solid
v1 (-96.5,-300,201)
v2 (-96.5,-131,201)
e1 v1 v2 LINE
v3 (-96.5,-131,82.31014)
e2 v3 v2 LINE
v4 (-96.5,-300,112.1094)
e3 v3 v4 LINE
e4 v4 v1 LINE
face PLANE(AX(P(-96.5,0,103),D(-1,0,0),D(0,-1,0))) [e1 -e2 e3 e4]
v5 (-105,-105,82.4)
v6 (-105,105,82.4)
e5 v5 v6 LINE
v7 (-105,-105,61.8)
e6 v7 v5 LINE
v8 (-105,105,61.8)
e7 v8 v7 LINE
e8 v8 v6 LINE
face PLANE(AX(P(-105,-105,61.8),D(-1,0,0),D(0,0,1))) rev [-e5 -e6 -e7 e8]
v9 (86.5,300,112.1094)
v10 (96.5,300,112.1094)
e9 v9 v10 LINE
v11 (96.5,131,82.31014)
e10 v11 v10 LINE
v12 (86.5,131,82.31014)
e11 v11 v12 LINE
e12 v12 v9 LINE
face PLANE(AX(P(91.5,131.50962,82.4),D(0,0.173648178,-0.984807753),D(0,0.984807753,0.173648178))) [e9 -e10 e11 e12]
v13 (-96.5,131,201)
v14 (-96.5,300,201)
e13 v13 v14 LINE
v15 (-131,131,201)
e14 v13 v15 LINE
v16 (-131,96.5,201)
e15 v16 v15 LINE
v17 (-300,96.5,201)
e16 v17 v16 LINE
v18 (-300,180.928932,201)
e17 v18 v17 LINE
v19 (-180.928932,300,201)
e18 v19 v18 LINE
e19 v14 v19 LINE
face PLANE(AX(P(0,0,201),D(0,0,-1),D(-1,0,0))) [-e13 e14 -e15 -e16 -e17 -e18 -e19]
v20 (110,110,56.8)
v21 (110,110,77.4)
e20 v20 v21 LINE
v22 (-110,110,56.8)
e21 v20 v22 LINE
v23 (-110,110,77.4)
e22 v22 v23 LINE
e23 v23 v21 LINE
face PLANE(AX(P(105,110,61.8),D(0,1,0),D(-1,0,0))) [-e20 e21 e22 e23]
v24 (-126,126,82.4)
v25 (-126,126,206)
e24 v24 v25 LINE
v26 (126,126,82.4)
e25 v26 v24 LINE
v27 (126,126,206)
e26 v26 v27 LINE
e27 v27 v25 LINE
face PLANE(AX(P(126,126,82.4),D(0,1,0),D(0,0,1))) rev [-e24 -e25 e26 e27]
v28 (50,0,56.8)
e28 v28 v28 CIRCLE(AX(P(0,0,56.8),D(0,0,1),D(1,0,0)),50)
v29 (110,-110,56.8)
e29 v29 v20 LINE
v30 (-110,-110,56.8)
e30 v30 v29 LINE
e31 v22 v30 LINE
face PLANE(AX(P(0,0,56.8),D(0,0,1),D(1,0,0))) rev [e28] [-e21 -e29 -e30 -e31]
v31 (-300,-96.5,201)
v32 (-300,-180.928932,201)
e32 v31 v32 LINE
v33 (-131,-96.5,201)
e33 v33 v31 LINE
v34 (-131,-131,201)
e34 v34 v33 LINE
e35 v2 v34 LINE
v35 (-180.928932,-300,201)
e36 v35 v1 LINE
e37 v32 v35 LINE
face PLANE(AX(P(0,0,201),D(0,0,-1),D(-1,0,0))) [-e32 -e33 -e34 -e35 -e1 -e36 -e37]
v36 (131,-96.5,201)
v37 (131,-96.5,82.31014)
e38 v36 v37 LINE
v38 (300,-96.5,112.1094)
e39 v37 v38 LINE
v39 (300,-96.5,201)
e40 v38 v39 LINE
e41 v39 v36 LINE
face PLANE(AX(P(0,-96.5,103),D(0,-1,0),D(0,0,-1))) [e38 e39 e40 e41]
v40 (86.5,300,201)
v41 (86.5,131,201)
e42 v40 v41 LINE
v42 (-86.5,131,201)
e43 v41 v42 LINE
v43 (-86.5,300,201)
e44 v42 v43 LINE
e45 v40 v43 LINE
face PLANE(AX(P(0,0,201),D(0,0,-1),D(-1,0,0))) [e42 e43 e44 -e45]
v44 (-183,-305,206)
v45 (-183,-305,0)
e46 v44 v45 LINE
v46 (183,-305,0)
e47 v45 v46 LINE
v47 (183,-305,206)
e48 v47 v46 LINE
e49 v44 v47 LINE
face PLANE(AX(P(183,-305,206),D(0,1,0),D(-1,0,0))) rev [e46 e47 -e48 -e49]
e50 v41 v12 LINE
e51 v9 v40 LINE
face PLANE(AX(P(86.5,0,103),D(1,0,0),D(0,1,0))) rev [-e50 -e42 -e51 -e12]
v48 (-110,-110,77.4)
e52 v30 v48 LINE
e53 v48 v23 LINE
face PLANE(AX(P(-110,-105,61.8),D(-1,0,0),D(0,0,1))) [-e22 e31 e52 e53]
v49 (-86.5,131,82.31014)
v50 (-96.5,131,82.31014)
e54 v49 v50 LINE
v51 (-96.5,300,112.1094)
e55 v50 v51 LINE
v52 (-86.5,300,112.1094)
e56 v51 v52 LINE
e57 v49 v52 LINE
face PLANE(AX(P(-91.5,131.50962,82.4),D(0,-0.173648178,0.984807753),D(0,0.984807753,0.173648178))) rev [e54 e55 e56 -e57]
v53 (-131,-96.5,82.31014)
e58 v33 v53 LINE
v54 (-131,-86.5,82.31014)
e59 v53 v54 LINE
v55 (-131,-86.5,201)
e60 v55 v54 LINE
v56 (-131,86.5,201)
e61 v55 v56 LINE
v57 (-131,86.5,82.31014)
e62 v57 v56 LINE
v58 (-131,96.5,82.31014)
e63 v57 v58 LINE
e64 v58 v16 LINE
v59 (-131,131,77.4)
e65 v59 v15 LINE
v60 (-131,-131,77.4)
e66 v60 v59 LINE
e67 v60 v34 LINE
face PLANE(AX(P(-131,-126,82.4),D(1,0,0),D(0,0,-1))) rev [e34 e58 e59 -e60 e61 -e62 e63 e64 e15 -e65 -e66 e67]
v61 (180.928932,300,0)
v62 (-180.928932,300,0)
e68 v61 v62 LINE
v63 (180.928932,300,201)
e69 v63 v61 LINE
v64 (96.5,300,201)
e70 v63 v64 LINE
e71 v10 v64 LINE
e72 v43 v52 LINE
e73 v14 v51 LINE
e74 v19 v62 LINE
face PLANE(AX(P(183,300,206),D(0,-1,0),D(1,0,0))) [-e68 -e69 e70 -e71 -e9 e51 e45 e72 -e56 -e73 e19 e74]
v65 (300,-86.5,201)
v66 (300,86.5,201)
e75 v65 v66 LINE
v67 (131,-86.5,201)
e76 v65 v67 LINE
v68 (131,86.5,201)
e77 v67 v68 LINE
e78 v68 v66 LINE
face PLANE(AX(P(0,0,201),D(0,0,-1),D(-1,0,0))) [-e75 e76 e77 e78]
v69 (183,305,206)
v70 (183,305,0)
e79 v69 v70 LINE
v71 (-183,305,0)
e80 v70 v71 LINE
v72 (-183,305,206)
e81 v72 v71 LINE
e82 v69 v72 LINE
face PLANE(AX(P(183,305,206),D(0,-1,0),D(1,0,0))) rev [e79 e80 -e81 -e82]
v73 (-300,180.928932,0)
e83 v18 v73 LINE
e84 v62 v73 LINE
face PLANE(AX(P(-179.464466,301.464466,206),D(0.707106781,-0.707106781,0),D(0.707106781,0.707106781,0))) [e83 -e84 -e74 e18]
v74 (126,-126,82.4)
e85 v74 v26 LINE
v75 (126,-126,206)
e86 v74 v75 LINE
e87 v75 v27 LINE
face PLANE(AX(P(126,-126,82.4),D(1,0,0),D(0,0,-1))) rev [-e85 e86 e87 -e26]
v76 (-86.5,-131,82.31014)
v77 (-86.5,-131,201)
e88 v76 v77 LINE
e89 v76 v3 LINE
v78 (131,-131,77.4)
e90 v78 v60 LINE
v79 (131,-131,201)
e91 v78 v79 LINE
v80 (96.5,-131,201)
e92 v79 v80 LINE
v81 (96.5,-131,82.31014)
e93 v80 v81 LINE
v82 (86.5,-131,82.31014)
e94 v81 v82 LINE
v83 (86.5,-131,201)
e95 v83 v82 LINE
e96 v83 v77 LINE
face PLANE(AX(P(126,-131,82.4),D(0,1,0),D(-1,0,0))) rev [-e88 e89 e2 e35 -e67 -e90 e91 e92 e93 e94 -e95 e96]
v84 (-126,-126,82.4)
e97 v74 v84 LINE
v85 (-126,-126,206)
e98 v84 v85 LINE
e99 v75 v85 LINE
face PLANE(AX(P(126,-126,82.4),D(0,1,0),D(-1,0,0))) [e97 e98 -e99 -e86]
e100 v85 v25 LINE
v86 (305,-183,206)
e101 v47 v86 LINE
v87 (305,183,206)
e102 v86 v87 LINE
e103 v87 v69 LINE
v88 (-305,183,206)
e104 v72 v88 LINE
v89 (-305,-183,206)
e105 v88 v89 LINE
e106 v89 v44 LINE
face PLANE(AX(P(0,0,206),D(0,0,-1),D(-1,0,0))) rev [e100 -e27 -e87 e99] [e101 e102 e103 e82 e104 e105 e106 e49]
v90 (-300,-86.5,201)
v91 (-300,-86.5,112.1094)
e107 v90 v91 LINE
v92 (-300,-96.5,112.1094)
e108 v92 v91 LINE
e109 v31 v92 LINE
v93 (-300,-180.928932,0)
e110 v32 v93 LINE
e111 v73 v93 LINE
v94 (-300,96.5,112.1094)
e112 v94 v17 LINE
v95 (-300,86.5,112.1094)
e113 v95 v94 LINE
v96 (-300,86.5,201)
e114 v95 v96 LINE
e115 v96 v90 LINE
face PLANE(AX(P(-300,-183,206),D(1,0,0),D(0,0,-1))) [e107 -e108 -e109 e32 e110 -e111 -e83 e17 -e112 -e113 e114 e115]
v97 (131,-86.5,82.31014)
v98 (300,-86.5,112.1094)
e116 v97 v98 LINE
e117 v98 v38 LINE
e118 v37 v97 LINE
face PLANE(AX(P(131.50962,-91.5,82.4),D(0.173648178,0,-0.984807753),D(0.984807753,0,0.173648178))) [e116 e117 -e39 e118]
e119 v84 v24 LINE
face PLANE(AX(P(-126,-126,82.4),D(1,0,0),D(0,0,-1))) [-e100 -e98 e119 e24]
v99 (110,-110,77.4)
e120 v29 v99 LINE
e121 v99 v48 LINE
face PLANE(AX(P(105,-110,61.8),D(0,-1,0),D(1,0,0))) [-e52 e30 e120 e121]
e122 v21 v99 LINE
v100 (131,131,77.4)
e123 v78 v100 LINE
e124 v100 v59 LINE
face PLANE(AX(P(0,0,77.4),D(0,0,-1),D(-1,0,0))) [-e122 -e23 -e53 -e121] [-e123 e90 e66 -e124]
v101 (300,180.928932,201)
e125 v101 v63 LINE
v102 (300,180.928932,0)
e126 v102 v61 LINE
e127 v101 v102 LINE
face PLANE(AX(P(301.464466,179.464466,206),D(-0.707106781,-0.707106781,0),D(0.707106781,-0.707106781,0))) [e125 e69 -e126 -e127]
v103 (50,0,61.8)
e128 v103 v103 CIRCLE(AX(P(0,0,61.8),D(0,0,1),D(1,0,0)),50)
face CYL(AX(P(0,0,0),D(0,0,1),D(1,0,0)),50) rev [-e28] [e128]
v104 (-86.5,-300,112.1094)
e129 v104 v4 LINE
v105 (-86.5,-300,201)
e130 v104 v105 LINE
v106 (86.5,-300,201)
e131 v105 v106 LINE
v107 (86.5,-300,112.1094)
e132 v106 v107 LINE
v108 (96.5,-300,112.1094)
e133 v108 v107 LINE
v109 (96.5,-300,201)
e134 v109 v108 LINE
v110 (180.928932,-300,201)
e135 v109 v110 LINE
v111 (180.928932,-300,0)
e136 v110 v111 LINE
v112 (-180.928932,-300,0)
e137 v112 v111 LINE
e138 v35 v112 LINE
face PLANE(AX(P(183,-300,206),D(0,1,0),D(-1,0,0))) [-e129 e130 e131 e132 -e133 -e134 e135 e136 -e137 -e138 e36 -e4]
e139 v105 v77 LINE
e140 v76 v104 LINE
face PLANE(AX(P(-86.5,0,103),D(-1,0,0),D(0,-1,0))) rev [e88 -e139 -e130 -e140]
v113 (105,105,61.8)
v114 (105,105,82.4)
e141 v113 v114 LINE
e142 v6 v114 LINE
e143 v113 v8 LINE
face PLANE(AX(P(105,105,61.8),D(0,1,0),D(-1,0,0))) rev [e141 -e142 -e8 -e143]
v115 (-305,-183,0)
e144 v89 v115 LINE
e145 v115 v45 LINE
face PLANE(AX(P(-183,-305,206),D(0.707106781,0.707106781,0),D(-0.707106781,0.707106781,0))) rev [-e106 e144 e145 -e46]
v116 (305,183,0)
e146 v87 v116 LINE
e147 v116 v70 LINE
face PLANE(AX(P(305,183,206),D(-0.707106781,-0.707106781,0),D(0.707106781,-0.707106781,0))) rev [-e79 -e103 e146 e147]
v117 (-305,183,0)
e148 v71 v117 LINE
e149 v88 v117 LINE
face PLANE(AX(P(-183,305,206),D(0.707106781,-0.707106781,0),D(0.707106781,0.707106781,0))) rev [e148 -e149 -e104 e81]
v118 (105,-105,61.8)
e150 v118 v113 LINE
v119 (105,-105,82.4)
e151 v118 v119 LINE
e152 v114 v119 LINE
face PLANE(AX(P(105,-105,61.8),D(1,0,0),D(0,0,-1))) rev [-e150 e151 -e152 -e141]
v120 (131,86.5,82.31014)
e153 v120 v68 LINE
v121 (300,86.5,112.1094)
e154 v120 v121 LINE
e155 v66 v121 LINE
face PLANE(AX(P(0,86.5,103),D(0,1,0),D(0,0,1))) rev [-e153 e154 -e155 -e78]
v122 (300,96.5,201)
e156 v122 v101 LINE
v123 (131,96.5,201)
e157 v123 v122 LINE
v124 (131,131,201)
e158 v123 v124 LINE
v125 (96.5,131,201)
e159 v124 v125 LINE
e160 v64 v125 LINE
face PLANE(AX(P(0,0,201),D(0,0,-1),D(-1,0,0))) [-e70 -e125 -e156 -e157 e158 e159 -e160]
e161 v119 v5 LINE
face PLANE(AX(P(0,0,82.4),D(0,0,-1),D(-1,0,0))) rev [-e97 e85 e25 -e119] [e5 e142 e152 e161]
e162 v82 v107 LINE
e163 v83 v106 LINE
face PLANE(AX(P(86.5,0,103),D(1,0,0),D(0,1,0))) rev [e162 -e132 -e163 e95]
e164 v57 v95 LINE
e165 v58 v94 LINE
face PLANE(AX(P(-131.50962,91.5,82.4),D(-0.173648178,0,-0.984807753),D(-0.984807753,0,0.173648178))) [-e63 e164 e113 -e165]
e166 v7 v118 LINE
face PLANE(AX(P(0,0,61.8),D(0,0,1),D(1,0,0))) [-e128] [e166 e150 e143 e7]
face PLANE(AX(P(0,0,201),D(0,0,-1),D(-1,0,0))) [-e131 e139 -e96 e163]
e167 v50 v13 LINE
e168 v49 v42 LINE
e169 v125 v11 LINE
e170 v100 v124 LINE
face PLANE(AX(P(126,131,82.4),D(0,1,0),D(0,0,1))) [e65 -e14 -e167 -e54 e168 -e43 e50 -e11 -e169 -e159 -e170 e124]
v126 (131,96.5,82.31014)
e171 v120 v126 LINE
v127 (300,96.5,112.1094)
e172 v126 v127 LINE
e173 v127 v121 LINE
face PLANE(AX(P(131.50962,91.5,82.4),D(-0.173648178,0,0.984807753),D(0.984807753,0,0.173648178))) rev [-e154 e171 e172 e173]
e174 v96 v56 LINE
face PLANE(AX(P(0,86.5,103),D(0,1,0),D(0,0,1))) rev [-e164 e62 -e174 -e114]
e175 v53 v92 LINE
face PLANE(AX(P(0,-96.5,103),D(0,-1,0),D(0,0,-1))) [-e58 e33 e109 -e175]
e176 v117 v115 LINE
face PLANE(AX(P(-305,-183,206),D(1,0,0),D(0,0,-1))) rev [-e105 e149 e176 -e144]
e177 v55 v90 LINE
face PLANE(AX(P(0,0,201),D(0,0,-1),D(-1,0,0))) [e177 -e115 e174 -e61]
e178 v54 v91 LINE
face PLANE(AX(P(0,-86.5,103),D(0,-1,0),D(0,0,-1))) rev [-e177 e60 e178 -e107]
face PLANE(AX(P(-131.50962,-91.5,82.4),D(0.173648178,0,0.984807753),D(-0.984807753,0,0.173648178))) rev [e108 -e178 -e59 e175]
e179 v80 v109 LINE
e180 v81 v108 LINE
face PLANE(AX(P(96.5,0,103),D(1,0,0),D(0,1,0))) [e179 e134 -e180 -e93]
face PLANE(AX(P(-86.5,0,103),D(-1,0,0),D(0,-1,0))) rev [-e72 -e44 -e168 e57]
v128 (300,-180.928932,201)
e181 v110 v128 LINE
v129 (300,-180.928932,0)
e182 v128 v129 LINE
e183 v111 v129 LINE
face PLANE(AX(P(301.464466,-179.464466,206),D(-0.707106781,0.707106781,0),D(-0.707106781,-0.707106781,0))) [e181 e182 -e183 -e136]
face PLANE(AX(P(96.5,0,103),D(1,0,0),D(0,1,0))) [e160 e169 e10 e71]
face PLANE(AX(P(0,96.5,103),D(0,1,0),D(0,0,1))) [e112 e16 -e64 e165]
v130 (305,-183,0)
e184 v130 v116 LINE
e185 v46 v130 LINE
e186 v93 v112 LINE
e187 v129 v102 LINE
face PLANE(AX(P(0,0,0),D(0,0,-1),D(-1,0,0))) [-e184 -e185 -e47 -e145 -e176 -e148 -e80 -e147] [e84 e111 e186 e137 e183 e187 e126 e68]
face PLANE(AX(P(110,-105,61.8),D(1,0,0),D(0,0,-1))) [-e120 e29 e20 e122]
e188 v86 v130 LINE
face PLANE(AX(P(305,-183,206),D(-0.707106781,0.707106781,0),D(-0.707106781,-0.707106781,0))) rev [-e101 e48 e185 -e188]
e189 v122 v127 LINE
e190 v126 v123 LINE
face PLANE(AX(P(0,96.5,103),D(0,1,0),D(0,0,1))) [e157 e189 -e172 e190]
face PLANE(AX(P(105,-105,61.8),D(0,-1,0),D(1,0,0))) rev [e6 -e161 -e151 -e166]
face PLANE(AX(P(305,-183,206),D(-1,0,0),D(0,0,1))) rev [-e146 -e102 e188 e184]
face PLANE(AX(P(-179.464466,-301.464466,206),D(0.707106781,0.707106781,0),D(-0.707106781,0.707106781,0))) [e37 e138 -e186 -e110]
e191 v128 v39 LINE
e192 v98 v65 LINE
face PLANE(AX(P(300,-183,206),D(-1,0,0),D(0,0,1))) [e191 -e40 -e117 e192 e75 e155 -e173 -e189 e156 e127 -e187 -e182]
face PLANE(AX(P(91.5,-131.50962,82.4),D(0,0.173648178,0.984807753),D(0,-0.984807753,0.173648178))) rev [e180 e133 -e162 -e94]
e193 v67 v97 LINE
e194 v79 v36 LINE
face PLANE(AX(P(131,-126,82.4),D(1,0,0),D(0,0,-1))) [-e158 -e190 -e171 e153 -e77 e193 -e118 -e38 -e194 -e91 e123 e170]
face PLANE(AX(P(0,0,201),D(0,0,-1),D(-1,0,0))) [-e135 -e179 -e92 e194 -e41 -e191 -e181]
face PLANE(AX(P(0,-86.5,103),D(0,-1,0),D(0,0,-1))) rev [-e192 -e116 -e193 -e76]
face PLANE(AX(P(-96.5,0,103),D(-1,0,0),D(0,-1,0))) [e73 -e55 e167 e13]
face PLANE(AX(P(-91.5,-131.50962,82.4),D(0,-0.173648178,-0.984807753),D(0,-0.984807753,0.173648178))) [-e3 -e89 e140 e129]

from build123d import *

# Parameters (mm, degrees)
EXTRUDE_1_DEPTH                    = 206
SKETCH_3_W                         = 252
SKETCH_3_H                         = 252
CUT_EXTRUDE_2_DEPTH                = 123.6
SKETCH_5_W                         = 210
SKETCH_5_H                         = 210
CUT_EXTRUDE_3_DEPTH                = 144.2
SHELL_1_T                          = -5
SKETCH_6_R                         = 50
CUT_EXTRUDE_4_DEPTH                = 455.80065963
RIB_1_REACH                        = 542.993
SKETCH_9_WALL_W                    = 1254.563441332
SKETCH_9_WALL_H                    = 10
PATTERN_CIRCULAR_2_COPY_1_REACH    = 542.993
PATTERN_CIRCULAR_2_COPY_1_SKETCH_W = 1254.563441332
PATTERN_CIRCULAR_2_COPY_1_SKETCH_H = 10
PATTERN_CIRCULAR_2_COPY_2_REACH    = 542.993
PATTERN_CIRCULAR_2_COPY_2_SKETCH_W = 1254.563441332
PATTERN_CIRCULAR_2_COPY_2_SKETCH_H = 10
PATTERN_CIRCULAR_2_COPY_3_REACH    = 542.993
PATTERN_CIRCULAR_2_COPY_3_SKETCH_W = 1254.563441332
PATTERN_CIRCULAR_2_COPY_3_SKETCH_H = 10
PATTERN_CIRCULAR_2_COPY_4_REACH    = 542.993
PATTERN_CIRCULAR_2_COPY_4_SKETCH_W = 1254.563441332
PATTERN_CIRCULAR_2_COPY_4_SKETCH_H = 10
PATTERN_CIRCULAR_2_COPY_5_REACH    = 542.993
PATTERN_CIRCULAR_2_COPY_5_SKETCH_W = 1254.563441332
PATTERN_CIRCULAR_2_COPY_5_SKETCH_H = 10
PATTERN_CIRCULAR_2_COPY_6_REACH    = 542.993
PATTERN_CIRCULAR_2_COPY_6_SKETCH_W = 1254.563441332
PATTERN_CIRCULAR_2_COPY_6_SKETCH_H = 10


with BuildPart() as part:
    # 草图2 → 凸台-拉伸1 (new body)
    with BuildSketch(Plane.XY):
        Polygon((-183, 305), (-305, 183), (-305, -183), (-183, -305), (183, -305), (305, -183), (305, 183), (183, 305), align=None)
    extrude(amount=EXTRUDE_1_DEPTH)

    # 草图3 → 切除-拉伸2 (cut)
    with BuildSketch(Plane.XY.offset(206)):
        Rectangle(SKETCH_3_W, SKETCH_3_H)
    extrude(amount=-CUT_EXTRUDE_2_DEPTH, mode=Mode.SUBTRACT)

    # 草图5 → 切除-拉伸3 (cut)
    with BuildSketch(Plane.XY.offset(206)):
        Rectangle(SKETCH_5_W, SKETCH_5_H)
    extrude(amount=-CUT_EXTRUDE_3_DEPTH, mode=Mode.SUBTRACT)

    # 抽壳1
    shell_1_openings = [part.faces().sort_by_distance(p)[0] for p in [
        (0, 0, 0),
    ]]
    offset(amount=SHELL_1_T, openings=shell_1_openings, kind=Kind.INTERSECTION)

    # 草图6 → 切除-拉伸4 (cut, through all)
    with BuildSketch(Plane.XY.offset(61.8)):
        Circle(SKETCH_6_R)
    extrude(amount=-CUT_EXTRUDE_4_DEPTH, mode=Mode.SUBTRACT)

    # 草图9 wall → 筋1 (add, up to next)
    with BuildSketch(Plane(origin=(215.502773099, 91.5, 97.210259174), x_dir=(0.984807753012, 0, 0.173648177669), z_dir=(0.173648177669, 0, -0.984807753012)), mode=Mode.PRIVATE) as rib_1_sk1:
        Rectangle(SKETCH_9_WALL_W, SKETCH_9_WALL_H)
    rib_1_tool1 = extrude(rib_1_sk1.sketch, amount=-RIB_1_REACH, mode=Mode.PRIVATE) - part.part
    rib_1 = rib_1_tool1.solids().sort_by_distance((215.502773099, 91.5, 97.210259174))[0]
    add(rib_1)

    # 镜向1: 筋1 across plane
    add(rib_1.mirror(Plane.ZX))

    # 阵列(圆周)2 copy 1 sketch → 阵列(圆周)2 copy 1 (add, up to next)
    with BuildSketch(Plane(origin=(91.5, 215.502773099, 97.210259174), x_dir=(0, 0.984807753012, 0.173648177669), z_dir=(0, 0.173648177669, -0.984807753012)), mode=Mode.PRIVATE) as pattern_circular_2_copy_1_sk1:
        Rectangle(PATTERN_CIRCULAR_2_COPY_1_SKETCH_W, PATTERN_CIRCULAR_2_COPY_1_SKETCH_H)
    pattern_circular_2_copy_1_tool1 = extrude(pattern_circular_2_copy_1_sk1.sketch, amount=-PATTERN_CIRCULAR_2_COPY_1_REACH, mode=Mode.PRIVATE) - part.part
    add(pattern_circular_2_copy_1_tool1.solids().sort_by_distance((91.5, 215.502773099, 97.210259174))[0])

    # 阵列(圆周)2 copy 2 sketch → 阵列(圆周)2 copy 2 (add, up to next)
    with BuildSketch(Plane(origin=(-215.502773099, 91.5, 97.210259174), x_dir=(-0.984807753012, 0, 0.173648177669), z_dir=(-0.173648177669, 0, -0.984807753012)), mode=Mode.PRIVATE) as pattern_circular_2_copy_2_sk1:
        Rectangle(PATTERN_CIRCULAR_2_COPY_2_SKETCH_W, PATTERN_CIRCULAR_2_COPY_2_SKETCH_H)
    pattern_circular_2_copy_2_tool1 = extrude(pattern_circular_2_copy_2_sk1.sketch, amount=-PATTERN_CIRCULAR_2_COPY_2_REACH, mode=Mode.PRIVATE) - part.part
    add(pattern_circular_2_copy_2_tool1.solids().sort_by_distance((-215.502773099, 91.5, 97.210259174))[0])

    # 阵列(圆周)2 copy 3 sketch → 阵列(圆周)2 copy 3 (add, up to next)
    with BuildSketch(Plane(origin=(-91.5, -215.502773099, 97.210259174), x_dir=(0, -0.984807753012, 0.173648177669), z_dir=(0, -0.173648177669, -0.984807753012)), mode=Mode.PRIVATE) as pattern_circular_2_copy_3_sk1:
        Rectangle(PATTERN_CIRCULAR_2_COPY_3_SKETCH_W, PATTERN_CIRCULAR_2_COPY_3_SKETCH_H)
    pattern_circular_2_copy_3_tool1 = extrude(pattern_circular_2_copy_3_sk1.sketch, amount=-PATTERN_CIRCULAR_2_COPY_3_REACH, mode=Mode.PRIVATE) - part.part
    add(pattern_circular_2_copy_3_tool1.solids().sort_by_distance((-91.5, -215.502773099, 97.210259174))[0])

    # 阵列(圆周)2 copy 4 sketch → 阵列(圆周)2 copy 4 (add, up to next)
    with BuildSketch(Plane(origin=(-91.5, 215.502773099, 97.210259174), x_dir=(0, 0.984807753012, 0.173648177669), z_dir=(0, 0.173648177669, -0.984807753012)), mode=Mode.PRIVATE) as pattern_circular_2_copy_4_sk1:
        Rectangle(PATTERN_CIRCULAR_2_COPY_4_SKETCH_W, PATTERN_CIRCULAR_2_COPY_4_SKETCH_H)
    pattern_circular_2_copy_4_tool1 = extrude(pattern_circular_2_copy_4_sk1.sketch, amount=-PATTERN_CIRCULAR_2_COPY_4_REACH, mode=Mode.PRIVATE) - part.part
    add(pattern_circular_2_copy_4_tool1.solids().sort_by_distance((-91.5, 215.502773099, 97.210259174))[0])

    # 阵列(圆周)2 copy 5 sketch → 阵列(圆周)2 copy 5 (add, up to next)
    with BuildSketch(Plane(origin=(-215.502773099, -91.5, 97.210259174), x_dir=(-0.984807753012, 0, 0.173648177669), z_dir=(-0.173648177669, 0, -0.984807753012)), mode=Mode.PRIVATE) as pattern_circular_2_copy_5_sk1:
        Rectangle(PATTERN_CIRCULAR_2_COPY_5_SKETCH_W, PATTERN_CIRCULAR_2_COPY_5_SKETCH_H)
    pattern_circular_2_copy_5_tool1 = extrude(pattern_circular_2_copy_5_sk1.sketch, amount=-PATTERN_CIRCULAR_2_COPY_5_REACH, mode=Mode.PRIVATE) - part.part
    add(pattern_circular_2_copy_5_tool1.solids().sort_by_distance((-215.502773099, -91.5, 97.210259174))[0])

    # 阵列(圆周)2 copy 6 sketch → 阵列(圆周)2 copy 6 (add, up to next)
    with BuildSketch(Plane(origin=(91.5, -215.502773099, 97.210259174), x_dir=(0, -0.984807753012, 0.173648177669), z_dir=(0, -0.173648177669, -0.984807753012)), mode=Mode.PRIVATE) as pattern_circular_2_copy_6_sk1:
        Rectangle(PATTERN_CIRCULAR_2_COPY_6_SKETCH_W, PATTERN_CIRCULAR_2_COPY_6_SKETCH_H)
    pattern_circular_2_copy_6_tool1 = extrude(pattern_circular_2_copy_6_sk1.sketch, amount=-PATTERN_CIRCULAR_2_COPY_6_REACH, mode=Mode.PRIVATE) - part.part
    add(pattern_circular_2_copy_6_tool1.solids().sort_by_distance((91.5, -215.502773099, 97.210259174))[0])


solid = part.part
